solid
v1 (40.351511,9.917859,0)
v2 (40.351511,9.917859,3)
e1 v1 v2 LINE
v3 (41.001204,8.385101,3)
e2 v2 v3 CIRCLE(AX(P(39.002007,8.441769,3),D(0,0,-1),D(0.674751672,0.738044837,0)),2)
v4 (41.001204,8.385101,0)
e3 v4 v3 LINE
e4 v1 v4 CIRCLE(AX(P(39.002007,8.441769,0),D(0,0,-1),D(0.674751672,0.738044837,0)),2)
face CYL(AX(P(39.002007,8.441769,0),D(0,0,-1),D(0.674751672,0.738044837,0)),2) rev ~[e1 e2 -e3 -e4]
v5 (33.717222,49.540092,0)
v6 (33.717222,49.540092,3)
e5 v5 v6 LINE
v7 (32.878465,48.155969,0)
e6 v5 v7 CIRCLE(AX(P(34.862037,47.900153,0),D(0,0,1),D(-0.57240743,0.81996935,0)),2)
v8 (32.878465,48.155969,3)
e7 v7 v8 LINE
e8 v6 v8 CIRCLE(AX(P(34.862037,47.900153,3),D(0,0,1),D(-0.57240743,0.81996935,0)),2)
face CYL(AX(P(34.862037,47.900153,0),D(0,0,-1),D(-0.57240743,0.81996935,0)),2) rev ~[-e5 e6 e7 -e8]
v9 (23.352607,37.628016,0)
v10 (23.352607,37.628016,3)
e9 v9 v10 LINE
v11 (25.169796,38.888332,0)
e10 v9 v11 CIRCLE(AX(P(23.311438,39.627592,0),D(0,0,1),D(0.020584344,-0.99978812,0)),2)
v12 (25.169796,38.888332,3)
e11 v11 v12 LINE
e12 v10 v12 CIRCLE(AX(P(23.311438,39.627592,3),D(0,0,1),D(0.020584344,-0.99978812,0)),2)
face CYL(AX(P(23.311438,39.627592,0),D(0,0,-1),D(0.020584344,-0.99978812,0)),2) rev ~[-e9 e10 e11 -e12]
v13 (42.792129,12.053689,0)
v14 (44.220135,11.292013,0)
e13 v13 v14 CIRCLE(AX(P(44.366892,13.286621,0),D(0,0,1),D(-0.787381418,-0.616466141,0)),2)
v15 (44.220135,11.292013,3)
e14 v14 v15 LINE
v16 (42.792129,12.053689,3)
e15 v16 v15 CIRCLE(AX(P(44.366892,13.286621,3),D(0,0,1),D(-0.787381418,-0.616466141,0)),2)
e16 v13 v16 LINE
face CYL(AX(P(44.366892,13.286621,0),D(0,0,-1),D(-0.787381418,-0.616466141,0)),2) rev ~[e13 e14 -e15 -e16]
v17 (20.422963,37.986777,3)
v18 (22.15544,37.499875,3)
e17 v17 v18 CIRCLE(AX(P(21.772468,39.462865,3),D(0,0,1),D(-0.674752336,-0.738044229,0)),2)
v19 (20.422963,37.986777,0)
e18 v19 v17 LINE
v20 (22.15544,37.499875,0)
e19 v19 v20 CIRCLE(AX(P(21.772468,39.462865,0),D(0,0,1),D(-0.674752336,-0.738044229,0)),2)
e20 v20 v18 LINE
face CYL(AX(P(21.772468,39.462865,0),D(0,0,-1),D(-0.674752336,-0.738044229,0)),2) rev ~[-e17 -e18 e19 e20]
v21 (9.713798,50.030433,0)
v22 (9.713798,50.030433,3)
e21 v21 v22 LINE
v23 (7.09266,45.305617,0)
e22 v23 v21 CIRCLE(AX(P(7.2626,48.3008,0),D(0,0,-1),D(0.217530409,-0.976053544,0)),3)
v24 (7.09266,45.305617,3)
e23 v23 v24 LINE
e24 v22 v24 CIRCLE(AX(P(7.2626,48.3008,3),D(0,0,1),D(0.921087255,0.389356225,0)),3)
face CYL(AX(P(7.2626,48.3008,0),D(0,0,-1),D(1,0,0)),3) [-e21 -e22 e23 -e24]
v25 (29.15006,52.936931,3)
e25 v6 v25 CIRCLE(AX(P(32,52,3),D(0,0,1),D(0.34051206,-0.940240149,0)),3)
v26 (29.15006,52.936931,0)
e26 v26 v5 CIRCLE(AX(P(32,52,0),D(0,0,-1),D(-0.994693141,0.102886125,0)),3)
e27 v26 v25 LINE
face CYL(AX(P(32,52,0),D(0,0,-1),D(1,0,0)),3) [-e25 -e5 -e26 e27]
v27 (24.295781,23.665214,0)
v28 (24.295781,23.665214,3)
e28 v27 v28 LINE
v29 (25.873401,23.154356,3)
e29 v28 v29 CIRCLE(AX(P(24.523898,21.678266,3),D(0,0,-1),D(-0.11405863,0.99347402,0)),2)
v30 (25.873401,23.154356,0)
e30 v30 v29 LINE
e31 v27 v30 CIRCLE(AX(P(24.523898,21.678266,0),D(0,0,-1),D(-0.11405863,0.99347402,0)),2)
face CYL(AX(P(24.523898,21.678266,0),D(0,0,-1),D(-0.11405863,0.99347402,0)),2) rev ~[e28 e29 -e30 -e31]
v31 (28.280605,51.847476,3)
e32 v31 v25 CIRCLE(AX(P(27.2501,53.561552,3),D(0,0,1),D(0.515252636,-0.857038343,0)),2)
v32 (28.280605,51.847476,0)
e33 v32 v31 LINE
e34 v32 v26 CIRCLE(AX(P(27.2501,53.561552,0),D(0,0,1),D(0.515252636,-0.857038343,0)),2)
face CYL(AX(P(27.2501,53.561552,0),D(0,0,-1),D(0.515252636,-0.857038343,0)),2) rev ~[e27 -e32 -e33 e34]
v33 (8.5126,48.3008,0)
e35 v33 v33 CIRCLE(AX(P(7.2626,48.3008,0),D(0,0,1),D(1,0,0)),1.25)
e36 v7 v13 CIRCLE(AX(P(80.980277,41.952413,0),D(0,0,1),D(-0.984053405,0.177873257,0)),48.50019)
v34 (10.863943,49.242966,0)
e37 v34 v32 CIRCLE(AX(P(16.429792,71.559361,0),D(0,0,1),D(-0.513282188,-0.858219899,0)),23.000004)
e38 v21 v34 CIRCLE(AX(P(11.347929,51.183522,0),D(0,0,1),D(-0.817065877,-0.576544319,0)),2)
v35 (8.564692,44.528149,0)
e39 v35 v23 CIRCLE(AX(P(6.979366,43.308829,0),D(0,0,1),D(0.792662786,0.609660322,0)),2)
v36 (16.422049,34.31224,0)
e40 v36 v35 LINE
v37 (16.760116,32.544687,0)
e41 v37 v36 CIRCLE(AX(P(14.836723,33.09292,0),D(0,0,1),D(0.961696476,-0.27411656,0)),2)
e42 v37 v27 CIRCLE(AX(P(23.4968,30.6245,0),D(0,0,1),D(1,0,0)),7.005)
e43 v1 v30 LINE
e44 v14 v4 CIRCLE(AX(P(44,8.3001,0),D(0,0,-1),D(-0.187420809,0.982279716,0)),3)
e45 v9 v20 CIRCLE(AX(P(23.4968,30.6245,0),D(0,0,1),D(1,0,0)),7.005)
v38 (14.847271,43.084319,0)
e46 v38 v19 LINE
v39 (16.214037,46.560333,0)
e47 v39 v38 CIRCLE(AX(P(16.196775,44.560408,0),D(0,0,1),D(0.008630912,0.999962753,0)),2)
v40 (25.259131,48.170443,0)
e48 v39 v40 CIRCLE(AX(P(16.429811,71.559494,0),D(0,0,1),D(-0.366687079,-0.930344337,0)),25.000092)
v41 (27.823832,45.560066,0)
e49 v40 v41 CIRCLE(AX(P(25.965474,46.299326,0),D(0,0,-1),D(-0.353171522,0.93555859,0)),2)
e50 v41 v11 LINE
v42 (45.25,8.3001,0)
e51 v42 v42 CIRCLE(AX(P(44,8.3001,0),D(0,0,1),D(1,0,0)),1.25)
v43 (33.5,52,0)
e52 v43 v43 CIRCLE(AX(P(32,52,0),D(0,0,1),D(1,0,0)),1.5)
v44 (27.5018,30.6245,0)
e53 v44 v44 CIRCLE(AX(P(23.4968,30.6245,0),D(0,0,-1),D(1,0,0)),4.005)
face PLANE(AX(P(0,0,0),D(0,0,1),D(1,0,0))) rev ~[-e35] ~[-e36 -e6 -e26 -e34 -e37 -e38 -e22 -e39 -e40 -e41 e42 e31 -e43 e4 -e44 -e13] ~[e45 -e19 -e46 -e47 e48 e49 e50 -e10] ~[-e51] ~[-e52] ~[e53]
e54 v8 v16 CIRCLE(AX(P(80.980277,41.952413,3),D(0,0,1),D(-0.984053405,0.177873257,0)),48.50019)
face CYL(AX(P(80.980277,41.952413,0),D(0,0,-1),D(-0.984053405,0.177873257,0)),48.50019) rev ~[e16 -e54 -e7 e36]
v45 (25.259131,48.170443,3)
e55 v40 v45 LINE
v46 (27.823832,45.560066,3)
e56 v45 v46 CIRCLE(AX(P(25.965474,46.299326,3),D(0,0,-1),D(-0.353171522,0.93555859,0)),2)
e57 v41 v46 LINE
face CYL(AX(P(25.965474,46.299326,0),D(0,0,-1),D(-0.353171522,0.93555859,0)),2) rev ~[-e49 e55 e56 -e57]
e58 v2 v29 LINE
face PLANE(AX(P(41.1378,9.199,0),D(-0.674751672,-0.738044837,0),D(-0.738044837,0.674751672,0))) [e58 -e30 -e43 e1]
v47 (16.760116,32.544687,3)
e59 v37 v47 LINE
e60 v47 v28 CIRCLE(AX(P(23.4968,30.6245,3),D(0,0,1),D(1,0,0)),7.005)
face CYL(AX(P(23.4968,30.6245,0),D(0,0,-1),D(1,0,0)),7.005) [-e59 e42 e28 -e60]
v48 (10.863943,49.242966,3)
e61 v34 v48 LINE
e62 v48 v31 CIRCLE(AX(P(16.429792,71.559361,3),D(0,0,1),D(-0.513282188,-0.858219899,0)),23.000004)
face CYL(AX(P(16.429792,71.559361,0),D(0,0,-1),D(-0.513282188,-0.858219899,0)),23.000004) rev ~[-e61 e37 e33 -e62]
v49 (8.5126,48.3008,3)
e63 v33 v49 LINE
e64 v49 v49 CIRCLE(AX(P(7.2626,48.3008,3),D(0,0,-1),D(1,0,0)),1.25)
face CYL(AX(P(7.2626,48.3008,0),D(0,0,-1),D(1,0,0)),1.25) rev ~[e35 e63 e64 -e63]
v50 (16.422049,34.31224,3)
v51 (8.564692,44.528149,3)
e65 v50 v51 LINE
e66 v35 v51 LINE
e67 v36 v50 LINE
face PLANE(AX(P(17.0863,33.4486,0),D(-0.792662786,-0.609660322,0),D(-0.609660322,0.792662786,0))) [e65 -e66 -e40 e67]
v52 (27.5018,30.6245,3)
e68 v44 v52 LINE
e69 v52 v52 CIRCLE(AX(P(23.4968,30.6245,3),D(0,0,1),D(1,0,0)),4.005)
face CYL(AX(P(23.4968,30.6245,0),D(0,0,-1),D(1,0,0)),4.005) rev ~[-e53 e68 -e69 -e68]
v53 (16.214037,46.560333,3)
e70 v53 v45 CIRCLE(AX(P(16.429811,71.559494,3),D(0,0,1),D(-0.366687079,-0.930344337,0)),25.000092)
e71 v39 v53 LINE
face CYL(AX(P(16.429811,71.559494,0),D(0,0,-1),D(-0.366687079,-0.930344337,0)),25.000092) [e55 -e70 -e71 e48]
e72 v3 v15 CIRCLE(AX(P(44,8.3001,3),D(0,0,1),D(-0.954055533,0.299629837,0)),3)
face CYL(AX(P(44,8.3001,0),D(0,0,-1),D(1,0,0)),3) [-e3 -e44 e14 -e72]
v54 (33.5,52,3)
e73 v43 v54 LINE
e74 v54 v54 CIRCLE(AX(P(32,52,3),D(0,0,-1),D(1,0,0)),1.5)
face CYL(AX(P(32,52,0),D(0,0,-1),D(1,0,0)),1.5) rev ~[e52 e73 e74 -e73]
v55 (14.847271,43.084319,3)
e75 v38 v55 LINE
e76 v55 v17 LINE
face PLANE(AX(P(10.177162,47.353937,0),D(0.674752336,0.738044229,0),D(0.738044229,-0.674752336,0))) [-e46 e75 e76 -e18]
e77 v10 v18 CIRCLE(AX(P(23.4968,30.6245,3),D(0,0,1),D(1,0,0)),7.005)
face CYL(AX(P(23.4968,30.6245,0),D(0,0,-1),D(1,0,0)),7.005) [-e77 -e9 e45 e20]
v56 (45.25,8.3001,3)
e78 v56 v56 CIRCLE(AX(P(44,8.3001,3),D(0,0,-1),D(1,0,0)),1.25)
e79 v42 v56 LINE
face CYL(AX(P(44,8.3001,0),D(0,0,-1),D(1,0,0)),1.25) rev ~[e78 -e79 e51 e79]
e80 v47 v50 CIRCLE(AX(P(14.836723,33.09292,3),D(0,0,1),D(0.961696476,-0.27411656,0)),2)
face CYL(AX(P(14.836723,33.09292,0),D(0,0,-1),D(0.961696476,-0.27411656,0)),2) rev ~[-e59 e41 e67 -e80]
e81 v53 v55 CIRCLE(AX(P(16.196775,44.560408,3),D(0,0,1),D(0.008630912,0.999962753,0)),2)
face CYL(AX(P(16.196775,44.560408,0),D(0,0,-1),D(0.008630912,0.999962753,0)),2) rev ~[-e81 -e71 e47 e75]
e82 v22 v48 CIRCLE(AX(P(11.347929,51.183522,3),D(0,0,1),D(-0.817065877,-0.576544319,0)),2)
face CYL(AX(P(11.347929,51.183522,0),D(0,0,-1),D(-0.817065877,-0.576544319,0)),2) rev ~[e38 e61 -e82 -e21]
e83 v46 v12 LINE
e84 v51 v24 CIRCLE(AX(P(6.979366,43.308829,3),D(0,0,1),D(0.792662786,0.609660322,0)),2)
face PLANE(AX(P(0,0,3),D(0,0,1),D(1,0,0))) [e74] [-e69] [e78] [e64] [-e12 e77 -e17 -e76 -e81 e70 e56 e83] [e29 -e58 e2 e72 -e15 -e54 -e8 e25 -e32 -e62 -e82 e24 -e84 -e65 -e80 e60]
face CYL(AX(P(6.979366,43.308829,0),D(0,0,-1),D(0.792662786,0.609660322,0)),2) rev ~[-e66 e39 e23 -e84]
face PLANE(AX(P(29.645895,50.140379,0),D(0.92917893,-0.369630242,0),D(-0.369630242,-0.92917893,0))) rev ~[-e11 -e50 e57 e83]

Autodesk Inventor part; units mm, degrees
ref_plane "YZ Plane" through (0, 0, 0) normal (1, 0, 0) x (0, 1, 0)
ref_plane "XZ Plane" through (0, 0, 0) normal (0, 1, 0) x (-1, 0, 0)
ref_plane "XY Plane" through (0, 0, 0) normal (0, 0, 1) x (1, 0, 0)
sketch "スケッチ1" plane through (0, 0, 0) normal (0, 0, 1) x (1, 0, 0)
  circle A0 centre (7.2626, 48.3008) radius 1.25
  circle A1 centre (23.4968, 30.6245) radius 4.005
  circle A2 centre (44, 8.3001) radius 1.25
  line L0 (10.1247, 47.4019) -> (21.2271, 37.2516)
  line L1 (17.0863, 33.4486) -> (7.9152, 45.3726)
  circle A3 centre (23.4968, 30.6245) radius 7.005
  line L2 (41.1378, 9.199) -> (25.1486, 23.817)
  line L3 (30.1394, 28.4007) -> (43.3474, 11.2282)
  circle A4 centre (7.2626, 48.3008) radius 3
  circle A5 centre (44, 8.3001) radius 3
  circle A6 centre (32, 52) radius 1.5
  circle A7 centre (32, 52) radius 3
  line L4 (32, 52) -> (23.4968, 30.6245)
  arc A8 (32, 52) -> (44, 8.3001) centre (80.98, 41.9524) ccw
  arc A9 (7.2626, 48.3008) -> (32, 52) centre (16.4298, 71.5594) ccw
  arc A10 (4.6243, 51.8203) -> (33.4933, 56.1374) centre (16.4298, 71.5594) ccw
  arc A11 (33.2535, 50.5793) -> (44.802, 9.6507) centre (80.98, 41.9524) ccw
  line L5 (33.3938, 51.4456) -> (24.8906, 30.0701)
  line L6 (30.6062, 52.5544) -> (22.103, 31.179)
  point P0 (0, 0)
  point P1 (0, 0)
  point P2 (43.4377, 11.2469)
  point P3 (33.0215, 49.1793)
  point P4 (29.0159, 52.3087)
  point P5 (10.0258, 49.4689)
  point P6 (10.1773, 47.3539)
  point P7 (29.545, 50.2758)
  point P8 (29.6459, 50.1404)
  point P9 (24.6322, 37.5369)
  point P10 (10.1146, 47.3701)
  point P11 (35.2275, 21.7854)
  point P12 (27.4198, 36.428)
  point P13 (31.1236, 45.7388)
  dimension "d0" = 2
  dimension "d1" = 1.5
  dimension "d2" = 1.5
  dimension "d3" = 1.5
  dimension "d4" = 25
  dimension "d5" = 50
extrude "押し出し1" add sketch "スケッチ1" along normal blind 3 contours A1 L5 A3 L6 | A1 L4 A3 L5 | L6 A3 L4 A1 | L5 A8 L3 A3 | A3 L4 A7 A8 L5 | L6 A7 L4 A3 | L5 A7 A11 A5 L3 A8 | A8 A7 L5 | A3 L1 A4 A9 L0 | L6 A9 A6 L4 A7 | A7 A9 L6 | L4 A6 A8 A7 | L3 A8 A5 L2 A3 | A8 A6 L5 A7 | L3 A5 A8 | L5 A6 L6 A9 A7 A10 | A9 A4 L0 | L0 A4 A10 A7 A9 | L6 A6 A9 | A5 | A4 A10 | A7 A10 | A4 A10
fillet "フィレット1" radius 2 13 edges at (10.1773, 47.3539, 1.5) (10.0258, 49.4689, 1.5) (7.9152, 45.3726, 1.5) (29.0159, 52.3087, 1.5) (29.6459, 50.1404, 1.5) (29.545, 50.2758, 1.5) (33.0215, 49.1793, 1.5) (21.2271, 37.2516, 1.5) (24.6322, 37.5369, 1.5) (17.0863, 33.4486, 1.5) (25.1486, 23.817, 1.5) (43.4377, 11.2469, 1.5) (41.1378, 9.199, 1.5)
properties part number "脚ギアマウントv3" material "アルミニウム 2014-T4"
